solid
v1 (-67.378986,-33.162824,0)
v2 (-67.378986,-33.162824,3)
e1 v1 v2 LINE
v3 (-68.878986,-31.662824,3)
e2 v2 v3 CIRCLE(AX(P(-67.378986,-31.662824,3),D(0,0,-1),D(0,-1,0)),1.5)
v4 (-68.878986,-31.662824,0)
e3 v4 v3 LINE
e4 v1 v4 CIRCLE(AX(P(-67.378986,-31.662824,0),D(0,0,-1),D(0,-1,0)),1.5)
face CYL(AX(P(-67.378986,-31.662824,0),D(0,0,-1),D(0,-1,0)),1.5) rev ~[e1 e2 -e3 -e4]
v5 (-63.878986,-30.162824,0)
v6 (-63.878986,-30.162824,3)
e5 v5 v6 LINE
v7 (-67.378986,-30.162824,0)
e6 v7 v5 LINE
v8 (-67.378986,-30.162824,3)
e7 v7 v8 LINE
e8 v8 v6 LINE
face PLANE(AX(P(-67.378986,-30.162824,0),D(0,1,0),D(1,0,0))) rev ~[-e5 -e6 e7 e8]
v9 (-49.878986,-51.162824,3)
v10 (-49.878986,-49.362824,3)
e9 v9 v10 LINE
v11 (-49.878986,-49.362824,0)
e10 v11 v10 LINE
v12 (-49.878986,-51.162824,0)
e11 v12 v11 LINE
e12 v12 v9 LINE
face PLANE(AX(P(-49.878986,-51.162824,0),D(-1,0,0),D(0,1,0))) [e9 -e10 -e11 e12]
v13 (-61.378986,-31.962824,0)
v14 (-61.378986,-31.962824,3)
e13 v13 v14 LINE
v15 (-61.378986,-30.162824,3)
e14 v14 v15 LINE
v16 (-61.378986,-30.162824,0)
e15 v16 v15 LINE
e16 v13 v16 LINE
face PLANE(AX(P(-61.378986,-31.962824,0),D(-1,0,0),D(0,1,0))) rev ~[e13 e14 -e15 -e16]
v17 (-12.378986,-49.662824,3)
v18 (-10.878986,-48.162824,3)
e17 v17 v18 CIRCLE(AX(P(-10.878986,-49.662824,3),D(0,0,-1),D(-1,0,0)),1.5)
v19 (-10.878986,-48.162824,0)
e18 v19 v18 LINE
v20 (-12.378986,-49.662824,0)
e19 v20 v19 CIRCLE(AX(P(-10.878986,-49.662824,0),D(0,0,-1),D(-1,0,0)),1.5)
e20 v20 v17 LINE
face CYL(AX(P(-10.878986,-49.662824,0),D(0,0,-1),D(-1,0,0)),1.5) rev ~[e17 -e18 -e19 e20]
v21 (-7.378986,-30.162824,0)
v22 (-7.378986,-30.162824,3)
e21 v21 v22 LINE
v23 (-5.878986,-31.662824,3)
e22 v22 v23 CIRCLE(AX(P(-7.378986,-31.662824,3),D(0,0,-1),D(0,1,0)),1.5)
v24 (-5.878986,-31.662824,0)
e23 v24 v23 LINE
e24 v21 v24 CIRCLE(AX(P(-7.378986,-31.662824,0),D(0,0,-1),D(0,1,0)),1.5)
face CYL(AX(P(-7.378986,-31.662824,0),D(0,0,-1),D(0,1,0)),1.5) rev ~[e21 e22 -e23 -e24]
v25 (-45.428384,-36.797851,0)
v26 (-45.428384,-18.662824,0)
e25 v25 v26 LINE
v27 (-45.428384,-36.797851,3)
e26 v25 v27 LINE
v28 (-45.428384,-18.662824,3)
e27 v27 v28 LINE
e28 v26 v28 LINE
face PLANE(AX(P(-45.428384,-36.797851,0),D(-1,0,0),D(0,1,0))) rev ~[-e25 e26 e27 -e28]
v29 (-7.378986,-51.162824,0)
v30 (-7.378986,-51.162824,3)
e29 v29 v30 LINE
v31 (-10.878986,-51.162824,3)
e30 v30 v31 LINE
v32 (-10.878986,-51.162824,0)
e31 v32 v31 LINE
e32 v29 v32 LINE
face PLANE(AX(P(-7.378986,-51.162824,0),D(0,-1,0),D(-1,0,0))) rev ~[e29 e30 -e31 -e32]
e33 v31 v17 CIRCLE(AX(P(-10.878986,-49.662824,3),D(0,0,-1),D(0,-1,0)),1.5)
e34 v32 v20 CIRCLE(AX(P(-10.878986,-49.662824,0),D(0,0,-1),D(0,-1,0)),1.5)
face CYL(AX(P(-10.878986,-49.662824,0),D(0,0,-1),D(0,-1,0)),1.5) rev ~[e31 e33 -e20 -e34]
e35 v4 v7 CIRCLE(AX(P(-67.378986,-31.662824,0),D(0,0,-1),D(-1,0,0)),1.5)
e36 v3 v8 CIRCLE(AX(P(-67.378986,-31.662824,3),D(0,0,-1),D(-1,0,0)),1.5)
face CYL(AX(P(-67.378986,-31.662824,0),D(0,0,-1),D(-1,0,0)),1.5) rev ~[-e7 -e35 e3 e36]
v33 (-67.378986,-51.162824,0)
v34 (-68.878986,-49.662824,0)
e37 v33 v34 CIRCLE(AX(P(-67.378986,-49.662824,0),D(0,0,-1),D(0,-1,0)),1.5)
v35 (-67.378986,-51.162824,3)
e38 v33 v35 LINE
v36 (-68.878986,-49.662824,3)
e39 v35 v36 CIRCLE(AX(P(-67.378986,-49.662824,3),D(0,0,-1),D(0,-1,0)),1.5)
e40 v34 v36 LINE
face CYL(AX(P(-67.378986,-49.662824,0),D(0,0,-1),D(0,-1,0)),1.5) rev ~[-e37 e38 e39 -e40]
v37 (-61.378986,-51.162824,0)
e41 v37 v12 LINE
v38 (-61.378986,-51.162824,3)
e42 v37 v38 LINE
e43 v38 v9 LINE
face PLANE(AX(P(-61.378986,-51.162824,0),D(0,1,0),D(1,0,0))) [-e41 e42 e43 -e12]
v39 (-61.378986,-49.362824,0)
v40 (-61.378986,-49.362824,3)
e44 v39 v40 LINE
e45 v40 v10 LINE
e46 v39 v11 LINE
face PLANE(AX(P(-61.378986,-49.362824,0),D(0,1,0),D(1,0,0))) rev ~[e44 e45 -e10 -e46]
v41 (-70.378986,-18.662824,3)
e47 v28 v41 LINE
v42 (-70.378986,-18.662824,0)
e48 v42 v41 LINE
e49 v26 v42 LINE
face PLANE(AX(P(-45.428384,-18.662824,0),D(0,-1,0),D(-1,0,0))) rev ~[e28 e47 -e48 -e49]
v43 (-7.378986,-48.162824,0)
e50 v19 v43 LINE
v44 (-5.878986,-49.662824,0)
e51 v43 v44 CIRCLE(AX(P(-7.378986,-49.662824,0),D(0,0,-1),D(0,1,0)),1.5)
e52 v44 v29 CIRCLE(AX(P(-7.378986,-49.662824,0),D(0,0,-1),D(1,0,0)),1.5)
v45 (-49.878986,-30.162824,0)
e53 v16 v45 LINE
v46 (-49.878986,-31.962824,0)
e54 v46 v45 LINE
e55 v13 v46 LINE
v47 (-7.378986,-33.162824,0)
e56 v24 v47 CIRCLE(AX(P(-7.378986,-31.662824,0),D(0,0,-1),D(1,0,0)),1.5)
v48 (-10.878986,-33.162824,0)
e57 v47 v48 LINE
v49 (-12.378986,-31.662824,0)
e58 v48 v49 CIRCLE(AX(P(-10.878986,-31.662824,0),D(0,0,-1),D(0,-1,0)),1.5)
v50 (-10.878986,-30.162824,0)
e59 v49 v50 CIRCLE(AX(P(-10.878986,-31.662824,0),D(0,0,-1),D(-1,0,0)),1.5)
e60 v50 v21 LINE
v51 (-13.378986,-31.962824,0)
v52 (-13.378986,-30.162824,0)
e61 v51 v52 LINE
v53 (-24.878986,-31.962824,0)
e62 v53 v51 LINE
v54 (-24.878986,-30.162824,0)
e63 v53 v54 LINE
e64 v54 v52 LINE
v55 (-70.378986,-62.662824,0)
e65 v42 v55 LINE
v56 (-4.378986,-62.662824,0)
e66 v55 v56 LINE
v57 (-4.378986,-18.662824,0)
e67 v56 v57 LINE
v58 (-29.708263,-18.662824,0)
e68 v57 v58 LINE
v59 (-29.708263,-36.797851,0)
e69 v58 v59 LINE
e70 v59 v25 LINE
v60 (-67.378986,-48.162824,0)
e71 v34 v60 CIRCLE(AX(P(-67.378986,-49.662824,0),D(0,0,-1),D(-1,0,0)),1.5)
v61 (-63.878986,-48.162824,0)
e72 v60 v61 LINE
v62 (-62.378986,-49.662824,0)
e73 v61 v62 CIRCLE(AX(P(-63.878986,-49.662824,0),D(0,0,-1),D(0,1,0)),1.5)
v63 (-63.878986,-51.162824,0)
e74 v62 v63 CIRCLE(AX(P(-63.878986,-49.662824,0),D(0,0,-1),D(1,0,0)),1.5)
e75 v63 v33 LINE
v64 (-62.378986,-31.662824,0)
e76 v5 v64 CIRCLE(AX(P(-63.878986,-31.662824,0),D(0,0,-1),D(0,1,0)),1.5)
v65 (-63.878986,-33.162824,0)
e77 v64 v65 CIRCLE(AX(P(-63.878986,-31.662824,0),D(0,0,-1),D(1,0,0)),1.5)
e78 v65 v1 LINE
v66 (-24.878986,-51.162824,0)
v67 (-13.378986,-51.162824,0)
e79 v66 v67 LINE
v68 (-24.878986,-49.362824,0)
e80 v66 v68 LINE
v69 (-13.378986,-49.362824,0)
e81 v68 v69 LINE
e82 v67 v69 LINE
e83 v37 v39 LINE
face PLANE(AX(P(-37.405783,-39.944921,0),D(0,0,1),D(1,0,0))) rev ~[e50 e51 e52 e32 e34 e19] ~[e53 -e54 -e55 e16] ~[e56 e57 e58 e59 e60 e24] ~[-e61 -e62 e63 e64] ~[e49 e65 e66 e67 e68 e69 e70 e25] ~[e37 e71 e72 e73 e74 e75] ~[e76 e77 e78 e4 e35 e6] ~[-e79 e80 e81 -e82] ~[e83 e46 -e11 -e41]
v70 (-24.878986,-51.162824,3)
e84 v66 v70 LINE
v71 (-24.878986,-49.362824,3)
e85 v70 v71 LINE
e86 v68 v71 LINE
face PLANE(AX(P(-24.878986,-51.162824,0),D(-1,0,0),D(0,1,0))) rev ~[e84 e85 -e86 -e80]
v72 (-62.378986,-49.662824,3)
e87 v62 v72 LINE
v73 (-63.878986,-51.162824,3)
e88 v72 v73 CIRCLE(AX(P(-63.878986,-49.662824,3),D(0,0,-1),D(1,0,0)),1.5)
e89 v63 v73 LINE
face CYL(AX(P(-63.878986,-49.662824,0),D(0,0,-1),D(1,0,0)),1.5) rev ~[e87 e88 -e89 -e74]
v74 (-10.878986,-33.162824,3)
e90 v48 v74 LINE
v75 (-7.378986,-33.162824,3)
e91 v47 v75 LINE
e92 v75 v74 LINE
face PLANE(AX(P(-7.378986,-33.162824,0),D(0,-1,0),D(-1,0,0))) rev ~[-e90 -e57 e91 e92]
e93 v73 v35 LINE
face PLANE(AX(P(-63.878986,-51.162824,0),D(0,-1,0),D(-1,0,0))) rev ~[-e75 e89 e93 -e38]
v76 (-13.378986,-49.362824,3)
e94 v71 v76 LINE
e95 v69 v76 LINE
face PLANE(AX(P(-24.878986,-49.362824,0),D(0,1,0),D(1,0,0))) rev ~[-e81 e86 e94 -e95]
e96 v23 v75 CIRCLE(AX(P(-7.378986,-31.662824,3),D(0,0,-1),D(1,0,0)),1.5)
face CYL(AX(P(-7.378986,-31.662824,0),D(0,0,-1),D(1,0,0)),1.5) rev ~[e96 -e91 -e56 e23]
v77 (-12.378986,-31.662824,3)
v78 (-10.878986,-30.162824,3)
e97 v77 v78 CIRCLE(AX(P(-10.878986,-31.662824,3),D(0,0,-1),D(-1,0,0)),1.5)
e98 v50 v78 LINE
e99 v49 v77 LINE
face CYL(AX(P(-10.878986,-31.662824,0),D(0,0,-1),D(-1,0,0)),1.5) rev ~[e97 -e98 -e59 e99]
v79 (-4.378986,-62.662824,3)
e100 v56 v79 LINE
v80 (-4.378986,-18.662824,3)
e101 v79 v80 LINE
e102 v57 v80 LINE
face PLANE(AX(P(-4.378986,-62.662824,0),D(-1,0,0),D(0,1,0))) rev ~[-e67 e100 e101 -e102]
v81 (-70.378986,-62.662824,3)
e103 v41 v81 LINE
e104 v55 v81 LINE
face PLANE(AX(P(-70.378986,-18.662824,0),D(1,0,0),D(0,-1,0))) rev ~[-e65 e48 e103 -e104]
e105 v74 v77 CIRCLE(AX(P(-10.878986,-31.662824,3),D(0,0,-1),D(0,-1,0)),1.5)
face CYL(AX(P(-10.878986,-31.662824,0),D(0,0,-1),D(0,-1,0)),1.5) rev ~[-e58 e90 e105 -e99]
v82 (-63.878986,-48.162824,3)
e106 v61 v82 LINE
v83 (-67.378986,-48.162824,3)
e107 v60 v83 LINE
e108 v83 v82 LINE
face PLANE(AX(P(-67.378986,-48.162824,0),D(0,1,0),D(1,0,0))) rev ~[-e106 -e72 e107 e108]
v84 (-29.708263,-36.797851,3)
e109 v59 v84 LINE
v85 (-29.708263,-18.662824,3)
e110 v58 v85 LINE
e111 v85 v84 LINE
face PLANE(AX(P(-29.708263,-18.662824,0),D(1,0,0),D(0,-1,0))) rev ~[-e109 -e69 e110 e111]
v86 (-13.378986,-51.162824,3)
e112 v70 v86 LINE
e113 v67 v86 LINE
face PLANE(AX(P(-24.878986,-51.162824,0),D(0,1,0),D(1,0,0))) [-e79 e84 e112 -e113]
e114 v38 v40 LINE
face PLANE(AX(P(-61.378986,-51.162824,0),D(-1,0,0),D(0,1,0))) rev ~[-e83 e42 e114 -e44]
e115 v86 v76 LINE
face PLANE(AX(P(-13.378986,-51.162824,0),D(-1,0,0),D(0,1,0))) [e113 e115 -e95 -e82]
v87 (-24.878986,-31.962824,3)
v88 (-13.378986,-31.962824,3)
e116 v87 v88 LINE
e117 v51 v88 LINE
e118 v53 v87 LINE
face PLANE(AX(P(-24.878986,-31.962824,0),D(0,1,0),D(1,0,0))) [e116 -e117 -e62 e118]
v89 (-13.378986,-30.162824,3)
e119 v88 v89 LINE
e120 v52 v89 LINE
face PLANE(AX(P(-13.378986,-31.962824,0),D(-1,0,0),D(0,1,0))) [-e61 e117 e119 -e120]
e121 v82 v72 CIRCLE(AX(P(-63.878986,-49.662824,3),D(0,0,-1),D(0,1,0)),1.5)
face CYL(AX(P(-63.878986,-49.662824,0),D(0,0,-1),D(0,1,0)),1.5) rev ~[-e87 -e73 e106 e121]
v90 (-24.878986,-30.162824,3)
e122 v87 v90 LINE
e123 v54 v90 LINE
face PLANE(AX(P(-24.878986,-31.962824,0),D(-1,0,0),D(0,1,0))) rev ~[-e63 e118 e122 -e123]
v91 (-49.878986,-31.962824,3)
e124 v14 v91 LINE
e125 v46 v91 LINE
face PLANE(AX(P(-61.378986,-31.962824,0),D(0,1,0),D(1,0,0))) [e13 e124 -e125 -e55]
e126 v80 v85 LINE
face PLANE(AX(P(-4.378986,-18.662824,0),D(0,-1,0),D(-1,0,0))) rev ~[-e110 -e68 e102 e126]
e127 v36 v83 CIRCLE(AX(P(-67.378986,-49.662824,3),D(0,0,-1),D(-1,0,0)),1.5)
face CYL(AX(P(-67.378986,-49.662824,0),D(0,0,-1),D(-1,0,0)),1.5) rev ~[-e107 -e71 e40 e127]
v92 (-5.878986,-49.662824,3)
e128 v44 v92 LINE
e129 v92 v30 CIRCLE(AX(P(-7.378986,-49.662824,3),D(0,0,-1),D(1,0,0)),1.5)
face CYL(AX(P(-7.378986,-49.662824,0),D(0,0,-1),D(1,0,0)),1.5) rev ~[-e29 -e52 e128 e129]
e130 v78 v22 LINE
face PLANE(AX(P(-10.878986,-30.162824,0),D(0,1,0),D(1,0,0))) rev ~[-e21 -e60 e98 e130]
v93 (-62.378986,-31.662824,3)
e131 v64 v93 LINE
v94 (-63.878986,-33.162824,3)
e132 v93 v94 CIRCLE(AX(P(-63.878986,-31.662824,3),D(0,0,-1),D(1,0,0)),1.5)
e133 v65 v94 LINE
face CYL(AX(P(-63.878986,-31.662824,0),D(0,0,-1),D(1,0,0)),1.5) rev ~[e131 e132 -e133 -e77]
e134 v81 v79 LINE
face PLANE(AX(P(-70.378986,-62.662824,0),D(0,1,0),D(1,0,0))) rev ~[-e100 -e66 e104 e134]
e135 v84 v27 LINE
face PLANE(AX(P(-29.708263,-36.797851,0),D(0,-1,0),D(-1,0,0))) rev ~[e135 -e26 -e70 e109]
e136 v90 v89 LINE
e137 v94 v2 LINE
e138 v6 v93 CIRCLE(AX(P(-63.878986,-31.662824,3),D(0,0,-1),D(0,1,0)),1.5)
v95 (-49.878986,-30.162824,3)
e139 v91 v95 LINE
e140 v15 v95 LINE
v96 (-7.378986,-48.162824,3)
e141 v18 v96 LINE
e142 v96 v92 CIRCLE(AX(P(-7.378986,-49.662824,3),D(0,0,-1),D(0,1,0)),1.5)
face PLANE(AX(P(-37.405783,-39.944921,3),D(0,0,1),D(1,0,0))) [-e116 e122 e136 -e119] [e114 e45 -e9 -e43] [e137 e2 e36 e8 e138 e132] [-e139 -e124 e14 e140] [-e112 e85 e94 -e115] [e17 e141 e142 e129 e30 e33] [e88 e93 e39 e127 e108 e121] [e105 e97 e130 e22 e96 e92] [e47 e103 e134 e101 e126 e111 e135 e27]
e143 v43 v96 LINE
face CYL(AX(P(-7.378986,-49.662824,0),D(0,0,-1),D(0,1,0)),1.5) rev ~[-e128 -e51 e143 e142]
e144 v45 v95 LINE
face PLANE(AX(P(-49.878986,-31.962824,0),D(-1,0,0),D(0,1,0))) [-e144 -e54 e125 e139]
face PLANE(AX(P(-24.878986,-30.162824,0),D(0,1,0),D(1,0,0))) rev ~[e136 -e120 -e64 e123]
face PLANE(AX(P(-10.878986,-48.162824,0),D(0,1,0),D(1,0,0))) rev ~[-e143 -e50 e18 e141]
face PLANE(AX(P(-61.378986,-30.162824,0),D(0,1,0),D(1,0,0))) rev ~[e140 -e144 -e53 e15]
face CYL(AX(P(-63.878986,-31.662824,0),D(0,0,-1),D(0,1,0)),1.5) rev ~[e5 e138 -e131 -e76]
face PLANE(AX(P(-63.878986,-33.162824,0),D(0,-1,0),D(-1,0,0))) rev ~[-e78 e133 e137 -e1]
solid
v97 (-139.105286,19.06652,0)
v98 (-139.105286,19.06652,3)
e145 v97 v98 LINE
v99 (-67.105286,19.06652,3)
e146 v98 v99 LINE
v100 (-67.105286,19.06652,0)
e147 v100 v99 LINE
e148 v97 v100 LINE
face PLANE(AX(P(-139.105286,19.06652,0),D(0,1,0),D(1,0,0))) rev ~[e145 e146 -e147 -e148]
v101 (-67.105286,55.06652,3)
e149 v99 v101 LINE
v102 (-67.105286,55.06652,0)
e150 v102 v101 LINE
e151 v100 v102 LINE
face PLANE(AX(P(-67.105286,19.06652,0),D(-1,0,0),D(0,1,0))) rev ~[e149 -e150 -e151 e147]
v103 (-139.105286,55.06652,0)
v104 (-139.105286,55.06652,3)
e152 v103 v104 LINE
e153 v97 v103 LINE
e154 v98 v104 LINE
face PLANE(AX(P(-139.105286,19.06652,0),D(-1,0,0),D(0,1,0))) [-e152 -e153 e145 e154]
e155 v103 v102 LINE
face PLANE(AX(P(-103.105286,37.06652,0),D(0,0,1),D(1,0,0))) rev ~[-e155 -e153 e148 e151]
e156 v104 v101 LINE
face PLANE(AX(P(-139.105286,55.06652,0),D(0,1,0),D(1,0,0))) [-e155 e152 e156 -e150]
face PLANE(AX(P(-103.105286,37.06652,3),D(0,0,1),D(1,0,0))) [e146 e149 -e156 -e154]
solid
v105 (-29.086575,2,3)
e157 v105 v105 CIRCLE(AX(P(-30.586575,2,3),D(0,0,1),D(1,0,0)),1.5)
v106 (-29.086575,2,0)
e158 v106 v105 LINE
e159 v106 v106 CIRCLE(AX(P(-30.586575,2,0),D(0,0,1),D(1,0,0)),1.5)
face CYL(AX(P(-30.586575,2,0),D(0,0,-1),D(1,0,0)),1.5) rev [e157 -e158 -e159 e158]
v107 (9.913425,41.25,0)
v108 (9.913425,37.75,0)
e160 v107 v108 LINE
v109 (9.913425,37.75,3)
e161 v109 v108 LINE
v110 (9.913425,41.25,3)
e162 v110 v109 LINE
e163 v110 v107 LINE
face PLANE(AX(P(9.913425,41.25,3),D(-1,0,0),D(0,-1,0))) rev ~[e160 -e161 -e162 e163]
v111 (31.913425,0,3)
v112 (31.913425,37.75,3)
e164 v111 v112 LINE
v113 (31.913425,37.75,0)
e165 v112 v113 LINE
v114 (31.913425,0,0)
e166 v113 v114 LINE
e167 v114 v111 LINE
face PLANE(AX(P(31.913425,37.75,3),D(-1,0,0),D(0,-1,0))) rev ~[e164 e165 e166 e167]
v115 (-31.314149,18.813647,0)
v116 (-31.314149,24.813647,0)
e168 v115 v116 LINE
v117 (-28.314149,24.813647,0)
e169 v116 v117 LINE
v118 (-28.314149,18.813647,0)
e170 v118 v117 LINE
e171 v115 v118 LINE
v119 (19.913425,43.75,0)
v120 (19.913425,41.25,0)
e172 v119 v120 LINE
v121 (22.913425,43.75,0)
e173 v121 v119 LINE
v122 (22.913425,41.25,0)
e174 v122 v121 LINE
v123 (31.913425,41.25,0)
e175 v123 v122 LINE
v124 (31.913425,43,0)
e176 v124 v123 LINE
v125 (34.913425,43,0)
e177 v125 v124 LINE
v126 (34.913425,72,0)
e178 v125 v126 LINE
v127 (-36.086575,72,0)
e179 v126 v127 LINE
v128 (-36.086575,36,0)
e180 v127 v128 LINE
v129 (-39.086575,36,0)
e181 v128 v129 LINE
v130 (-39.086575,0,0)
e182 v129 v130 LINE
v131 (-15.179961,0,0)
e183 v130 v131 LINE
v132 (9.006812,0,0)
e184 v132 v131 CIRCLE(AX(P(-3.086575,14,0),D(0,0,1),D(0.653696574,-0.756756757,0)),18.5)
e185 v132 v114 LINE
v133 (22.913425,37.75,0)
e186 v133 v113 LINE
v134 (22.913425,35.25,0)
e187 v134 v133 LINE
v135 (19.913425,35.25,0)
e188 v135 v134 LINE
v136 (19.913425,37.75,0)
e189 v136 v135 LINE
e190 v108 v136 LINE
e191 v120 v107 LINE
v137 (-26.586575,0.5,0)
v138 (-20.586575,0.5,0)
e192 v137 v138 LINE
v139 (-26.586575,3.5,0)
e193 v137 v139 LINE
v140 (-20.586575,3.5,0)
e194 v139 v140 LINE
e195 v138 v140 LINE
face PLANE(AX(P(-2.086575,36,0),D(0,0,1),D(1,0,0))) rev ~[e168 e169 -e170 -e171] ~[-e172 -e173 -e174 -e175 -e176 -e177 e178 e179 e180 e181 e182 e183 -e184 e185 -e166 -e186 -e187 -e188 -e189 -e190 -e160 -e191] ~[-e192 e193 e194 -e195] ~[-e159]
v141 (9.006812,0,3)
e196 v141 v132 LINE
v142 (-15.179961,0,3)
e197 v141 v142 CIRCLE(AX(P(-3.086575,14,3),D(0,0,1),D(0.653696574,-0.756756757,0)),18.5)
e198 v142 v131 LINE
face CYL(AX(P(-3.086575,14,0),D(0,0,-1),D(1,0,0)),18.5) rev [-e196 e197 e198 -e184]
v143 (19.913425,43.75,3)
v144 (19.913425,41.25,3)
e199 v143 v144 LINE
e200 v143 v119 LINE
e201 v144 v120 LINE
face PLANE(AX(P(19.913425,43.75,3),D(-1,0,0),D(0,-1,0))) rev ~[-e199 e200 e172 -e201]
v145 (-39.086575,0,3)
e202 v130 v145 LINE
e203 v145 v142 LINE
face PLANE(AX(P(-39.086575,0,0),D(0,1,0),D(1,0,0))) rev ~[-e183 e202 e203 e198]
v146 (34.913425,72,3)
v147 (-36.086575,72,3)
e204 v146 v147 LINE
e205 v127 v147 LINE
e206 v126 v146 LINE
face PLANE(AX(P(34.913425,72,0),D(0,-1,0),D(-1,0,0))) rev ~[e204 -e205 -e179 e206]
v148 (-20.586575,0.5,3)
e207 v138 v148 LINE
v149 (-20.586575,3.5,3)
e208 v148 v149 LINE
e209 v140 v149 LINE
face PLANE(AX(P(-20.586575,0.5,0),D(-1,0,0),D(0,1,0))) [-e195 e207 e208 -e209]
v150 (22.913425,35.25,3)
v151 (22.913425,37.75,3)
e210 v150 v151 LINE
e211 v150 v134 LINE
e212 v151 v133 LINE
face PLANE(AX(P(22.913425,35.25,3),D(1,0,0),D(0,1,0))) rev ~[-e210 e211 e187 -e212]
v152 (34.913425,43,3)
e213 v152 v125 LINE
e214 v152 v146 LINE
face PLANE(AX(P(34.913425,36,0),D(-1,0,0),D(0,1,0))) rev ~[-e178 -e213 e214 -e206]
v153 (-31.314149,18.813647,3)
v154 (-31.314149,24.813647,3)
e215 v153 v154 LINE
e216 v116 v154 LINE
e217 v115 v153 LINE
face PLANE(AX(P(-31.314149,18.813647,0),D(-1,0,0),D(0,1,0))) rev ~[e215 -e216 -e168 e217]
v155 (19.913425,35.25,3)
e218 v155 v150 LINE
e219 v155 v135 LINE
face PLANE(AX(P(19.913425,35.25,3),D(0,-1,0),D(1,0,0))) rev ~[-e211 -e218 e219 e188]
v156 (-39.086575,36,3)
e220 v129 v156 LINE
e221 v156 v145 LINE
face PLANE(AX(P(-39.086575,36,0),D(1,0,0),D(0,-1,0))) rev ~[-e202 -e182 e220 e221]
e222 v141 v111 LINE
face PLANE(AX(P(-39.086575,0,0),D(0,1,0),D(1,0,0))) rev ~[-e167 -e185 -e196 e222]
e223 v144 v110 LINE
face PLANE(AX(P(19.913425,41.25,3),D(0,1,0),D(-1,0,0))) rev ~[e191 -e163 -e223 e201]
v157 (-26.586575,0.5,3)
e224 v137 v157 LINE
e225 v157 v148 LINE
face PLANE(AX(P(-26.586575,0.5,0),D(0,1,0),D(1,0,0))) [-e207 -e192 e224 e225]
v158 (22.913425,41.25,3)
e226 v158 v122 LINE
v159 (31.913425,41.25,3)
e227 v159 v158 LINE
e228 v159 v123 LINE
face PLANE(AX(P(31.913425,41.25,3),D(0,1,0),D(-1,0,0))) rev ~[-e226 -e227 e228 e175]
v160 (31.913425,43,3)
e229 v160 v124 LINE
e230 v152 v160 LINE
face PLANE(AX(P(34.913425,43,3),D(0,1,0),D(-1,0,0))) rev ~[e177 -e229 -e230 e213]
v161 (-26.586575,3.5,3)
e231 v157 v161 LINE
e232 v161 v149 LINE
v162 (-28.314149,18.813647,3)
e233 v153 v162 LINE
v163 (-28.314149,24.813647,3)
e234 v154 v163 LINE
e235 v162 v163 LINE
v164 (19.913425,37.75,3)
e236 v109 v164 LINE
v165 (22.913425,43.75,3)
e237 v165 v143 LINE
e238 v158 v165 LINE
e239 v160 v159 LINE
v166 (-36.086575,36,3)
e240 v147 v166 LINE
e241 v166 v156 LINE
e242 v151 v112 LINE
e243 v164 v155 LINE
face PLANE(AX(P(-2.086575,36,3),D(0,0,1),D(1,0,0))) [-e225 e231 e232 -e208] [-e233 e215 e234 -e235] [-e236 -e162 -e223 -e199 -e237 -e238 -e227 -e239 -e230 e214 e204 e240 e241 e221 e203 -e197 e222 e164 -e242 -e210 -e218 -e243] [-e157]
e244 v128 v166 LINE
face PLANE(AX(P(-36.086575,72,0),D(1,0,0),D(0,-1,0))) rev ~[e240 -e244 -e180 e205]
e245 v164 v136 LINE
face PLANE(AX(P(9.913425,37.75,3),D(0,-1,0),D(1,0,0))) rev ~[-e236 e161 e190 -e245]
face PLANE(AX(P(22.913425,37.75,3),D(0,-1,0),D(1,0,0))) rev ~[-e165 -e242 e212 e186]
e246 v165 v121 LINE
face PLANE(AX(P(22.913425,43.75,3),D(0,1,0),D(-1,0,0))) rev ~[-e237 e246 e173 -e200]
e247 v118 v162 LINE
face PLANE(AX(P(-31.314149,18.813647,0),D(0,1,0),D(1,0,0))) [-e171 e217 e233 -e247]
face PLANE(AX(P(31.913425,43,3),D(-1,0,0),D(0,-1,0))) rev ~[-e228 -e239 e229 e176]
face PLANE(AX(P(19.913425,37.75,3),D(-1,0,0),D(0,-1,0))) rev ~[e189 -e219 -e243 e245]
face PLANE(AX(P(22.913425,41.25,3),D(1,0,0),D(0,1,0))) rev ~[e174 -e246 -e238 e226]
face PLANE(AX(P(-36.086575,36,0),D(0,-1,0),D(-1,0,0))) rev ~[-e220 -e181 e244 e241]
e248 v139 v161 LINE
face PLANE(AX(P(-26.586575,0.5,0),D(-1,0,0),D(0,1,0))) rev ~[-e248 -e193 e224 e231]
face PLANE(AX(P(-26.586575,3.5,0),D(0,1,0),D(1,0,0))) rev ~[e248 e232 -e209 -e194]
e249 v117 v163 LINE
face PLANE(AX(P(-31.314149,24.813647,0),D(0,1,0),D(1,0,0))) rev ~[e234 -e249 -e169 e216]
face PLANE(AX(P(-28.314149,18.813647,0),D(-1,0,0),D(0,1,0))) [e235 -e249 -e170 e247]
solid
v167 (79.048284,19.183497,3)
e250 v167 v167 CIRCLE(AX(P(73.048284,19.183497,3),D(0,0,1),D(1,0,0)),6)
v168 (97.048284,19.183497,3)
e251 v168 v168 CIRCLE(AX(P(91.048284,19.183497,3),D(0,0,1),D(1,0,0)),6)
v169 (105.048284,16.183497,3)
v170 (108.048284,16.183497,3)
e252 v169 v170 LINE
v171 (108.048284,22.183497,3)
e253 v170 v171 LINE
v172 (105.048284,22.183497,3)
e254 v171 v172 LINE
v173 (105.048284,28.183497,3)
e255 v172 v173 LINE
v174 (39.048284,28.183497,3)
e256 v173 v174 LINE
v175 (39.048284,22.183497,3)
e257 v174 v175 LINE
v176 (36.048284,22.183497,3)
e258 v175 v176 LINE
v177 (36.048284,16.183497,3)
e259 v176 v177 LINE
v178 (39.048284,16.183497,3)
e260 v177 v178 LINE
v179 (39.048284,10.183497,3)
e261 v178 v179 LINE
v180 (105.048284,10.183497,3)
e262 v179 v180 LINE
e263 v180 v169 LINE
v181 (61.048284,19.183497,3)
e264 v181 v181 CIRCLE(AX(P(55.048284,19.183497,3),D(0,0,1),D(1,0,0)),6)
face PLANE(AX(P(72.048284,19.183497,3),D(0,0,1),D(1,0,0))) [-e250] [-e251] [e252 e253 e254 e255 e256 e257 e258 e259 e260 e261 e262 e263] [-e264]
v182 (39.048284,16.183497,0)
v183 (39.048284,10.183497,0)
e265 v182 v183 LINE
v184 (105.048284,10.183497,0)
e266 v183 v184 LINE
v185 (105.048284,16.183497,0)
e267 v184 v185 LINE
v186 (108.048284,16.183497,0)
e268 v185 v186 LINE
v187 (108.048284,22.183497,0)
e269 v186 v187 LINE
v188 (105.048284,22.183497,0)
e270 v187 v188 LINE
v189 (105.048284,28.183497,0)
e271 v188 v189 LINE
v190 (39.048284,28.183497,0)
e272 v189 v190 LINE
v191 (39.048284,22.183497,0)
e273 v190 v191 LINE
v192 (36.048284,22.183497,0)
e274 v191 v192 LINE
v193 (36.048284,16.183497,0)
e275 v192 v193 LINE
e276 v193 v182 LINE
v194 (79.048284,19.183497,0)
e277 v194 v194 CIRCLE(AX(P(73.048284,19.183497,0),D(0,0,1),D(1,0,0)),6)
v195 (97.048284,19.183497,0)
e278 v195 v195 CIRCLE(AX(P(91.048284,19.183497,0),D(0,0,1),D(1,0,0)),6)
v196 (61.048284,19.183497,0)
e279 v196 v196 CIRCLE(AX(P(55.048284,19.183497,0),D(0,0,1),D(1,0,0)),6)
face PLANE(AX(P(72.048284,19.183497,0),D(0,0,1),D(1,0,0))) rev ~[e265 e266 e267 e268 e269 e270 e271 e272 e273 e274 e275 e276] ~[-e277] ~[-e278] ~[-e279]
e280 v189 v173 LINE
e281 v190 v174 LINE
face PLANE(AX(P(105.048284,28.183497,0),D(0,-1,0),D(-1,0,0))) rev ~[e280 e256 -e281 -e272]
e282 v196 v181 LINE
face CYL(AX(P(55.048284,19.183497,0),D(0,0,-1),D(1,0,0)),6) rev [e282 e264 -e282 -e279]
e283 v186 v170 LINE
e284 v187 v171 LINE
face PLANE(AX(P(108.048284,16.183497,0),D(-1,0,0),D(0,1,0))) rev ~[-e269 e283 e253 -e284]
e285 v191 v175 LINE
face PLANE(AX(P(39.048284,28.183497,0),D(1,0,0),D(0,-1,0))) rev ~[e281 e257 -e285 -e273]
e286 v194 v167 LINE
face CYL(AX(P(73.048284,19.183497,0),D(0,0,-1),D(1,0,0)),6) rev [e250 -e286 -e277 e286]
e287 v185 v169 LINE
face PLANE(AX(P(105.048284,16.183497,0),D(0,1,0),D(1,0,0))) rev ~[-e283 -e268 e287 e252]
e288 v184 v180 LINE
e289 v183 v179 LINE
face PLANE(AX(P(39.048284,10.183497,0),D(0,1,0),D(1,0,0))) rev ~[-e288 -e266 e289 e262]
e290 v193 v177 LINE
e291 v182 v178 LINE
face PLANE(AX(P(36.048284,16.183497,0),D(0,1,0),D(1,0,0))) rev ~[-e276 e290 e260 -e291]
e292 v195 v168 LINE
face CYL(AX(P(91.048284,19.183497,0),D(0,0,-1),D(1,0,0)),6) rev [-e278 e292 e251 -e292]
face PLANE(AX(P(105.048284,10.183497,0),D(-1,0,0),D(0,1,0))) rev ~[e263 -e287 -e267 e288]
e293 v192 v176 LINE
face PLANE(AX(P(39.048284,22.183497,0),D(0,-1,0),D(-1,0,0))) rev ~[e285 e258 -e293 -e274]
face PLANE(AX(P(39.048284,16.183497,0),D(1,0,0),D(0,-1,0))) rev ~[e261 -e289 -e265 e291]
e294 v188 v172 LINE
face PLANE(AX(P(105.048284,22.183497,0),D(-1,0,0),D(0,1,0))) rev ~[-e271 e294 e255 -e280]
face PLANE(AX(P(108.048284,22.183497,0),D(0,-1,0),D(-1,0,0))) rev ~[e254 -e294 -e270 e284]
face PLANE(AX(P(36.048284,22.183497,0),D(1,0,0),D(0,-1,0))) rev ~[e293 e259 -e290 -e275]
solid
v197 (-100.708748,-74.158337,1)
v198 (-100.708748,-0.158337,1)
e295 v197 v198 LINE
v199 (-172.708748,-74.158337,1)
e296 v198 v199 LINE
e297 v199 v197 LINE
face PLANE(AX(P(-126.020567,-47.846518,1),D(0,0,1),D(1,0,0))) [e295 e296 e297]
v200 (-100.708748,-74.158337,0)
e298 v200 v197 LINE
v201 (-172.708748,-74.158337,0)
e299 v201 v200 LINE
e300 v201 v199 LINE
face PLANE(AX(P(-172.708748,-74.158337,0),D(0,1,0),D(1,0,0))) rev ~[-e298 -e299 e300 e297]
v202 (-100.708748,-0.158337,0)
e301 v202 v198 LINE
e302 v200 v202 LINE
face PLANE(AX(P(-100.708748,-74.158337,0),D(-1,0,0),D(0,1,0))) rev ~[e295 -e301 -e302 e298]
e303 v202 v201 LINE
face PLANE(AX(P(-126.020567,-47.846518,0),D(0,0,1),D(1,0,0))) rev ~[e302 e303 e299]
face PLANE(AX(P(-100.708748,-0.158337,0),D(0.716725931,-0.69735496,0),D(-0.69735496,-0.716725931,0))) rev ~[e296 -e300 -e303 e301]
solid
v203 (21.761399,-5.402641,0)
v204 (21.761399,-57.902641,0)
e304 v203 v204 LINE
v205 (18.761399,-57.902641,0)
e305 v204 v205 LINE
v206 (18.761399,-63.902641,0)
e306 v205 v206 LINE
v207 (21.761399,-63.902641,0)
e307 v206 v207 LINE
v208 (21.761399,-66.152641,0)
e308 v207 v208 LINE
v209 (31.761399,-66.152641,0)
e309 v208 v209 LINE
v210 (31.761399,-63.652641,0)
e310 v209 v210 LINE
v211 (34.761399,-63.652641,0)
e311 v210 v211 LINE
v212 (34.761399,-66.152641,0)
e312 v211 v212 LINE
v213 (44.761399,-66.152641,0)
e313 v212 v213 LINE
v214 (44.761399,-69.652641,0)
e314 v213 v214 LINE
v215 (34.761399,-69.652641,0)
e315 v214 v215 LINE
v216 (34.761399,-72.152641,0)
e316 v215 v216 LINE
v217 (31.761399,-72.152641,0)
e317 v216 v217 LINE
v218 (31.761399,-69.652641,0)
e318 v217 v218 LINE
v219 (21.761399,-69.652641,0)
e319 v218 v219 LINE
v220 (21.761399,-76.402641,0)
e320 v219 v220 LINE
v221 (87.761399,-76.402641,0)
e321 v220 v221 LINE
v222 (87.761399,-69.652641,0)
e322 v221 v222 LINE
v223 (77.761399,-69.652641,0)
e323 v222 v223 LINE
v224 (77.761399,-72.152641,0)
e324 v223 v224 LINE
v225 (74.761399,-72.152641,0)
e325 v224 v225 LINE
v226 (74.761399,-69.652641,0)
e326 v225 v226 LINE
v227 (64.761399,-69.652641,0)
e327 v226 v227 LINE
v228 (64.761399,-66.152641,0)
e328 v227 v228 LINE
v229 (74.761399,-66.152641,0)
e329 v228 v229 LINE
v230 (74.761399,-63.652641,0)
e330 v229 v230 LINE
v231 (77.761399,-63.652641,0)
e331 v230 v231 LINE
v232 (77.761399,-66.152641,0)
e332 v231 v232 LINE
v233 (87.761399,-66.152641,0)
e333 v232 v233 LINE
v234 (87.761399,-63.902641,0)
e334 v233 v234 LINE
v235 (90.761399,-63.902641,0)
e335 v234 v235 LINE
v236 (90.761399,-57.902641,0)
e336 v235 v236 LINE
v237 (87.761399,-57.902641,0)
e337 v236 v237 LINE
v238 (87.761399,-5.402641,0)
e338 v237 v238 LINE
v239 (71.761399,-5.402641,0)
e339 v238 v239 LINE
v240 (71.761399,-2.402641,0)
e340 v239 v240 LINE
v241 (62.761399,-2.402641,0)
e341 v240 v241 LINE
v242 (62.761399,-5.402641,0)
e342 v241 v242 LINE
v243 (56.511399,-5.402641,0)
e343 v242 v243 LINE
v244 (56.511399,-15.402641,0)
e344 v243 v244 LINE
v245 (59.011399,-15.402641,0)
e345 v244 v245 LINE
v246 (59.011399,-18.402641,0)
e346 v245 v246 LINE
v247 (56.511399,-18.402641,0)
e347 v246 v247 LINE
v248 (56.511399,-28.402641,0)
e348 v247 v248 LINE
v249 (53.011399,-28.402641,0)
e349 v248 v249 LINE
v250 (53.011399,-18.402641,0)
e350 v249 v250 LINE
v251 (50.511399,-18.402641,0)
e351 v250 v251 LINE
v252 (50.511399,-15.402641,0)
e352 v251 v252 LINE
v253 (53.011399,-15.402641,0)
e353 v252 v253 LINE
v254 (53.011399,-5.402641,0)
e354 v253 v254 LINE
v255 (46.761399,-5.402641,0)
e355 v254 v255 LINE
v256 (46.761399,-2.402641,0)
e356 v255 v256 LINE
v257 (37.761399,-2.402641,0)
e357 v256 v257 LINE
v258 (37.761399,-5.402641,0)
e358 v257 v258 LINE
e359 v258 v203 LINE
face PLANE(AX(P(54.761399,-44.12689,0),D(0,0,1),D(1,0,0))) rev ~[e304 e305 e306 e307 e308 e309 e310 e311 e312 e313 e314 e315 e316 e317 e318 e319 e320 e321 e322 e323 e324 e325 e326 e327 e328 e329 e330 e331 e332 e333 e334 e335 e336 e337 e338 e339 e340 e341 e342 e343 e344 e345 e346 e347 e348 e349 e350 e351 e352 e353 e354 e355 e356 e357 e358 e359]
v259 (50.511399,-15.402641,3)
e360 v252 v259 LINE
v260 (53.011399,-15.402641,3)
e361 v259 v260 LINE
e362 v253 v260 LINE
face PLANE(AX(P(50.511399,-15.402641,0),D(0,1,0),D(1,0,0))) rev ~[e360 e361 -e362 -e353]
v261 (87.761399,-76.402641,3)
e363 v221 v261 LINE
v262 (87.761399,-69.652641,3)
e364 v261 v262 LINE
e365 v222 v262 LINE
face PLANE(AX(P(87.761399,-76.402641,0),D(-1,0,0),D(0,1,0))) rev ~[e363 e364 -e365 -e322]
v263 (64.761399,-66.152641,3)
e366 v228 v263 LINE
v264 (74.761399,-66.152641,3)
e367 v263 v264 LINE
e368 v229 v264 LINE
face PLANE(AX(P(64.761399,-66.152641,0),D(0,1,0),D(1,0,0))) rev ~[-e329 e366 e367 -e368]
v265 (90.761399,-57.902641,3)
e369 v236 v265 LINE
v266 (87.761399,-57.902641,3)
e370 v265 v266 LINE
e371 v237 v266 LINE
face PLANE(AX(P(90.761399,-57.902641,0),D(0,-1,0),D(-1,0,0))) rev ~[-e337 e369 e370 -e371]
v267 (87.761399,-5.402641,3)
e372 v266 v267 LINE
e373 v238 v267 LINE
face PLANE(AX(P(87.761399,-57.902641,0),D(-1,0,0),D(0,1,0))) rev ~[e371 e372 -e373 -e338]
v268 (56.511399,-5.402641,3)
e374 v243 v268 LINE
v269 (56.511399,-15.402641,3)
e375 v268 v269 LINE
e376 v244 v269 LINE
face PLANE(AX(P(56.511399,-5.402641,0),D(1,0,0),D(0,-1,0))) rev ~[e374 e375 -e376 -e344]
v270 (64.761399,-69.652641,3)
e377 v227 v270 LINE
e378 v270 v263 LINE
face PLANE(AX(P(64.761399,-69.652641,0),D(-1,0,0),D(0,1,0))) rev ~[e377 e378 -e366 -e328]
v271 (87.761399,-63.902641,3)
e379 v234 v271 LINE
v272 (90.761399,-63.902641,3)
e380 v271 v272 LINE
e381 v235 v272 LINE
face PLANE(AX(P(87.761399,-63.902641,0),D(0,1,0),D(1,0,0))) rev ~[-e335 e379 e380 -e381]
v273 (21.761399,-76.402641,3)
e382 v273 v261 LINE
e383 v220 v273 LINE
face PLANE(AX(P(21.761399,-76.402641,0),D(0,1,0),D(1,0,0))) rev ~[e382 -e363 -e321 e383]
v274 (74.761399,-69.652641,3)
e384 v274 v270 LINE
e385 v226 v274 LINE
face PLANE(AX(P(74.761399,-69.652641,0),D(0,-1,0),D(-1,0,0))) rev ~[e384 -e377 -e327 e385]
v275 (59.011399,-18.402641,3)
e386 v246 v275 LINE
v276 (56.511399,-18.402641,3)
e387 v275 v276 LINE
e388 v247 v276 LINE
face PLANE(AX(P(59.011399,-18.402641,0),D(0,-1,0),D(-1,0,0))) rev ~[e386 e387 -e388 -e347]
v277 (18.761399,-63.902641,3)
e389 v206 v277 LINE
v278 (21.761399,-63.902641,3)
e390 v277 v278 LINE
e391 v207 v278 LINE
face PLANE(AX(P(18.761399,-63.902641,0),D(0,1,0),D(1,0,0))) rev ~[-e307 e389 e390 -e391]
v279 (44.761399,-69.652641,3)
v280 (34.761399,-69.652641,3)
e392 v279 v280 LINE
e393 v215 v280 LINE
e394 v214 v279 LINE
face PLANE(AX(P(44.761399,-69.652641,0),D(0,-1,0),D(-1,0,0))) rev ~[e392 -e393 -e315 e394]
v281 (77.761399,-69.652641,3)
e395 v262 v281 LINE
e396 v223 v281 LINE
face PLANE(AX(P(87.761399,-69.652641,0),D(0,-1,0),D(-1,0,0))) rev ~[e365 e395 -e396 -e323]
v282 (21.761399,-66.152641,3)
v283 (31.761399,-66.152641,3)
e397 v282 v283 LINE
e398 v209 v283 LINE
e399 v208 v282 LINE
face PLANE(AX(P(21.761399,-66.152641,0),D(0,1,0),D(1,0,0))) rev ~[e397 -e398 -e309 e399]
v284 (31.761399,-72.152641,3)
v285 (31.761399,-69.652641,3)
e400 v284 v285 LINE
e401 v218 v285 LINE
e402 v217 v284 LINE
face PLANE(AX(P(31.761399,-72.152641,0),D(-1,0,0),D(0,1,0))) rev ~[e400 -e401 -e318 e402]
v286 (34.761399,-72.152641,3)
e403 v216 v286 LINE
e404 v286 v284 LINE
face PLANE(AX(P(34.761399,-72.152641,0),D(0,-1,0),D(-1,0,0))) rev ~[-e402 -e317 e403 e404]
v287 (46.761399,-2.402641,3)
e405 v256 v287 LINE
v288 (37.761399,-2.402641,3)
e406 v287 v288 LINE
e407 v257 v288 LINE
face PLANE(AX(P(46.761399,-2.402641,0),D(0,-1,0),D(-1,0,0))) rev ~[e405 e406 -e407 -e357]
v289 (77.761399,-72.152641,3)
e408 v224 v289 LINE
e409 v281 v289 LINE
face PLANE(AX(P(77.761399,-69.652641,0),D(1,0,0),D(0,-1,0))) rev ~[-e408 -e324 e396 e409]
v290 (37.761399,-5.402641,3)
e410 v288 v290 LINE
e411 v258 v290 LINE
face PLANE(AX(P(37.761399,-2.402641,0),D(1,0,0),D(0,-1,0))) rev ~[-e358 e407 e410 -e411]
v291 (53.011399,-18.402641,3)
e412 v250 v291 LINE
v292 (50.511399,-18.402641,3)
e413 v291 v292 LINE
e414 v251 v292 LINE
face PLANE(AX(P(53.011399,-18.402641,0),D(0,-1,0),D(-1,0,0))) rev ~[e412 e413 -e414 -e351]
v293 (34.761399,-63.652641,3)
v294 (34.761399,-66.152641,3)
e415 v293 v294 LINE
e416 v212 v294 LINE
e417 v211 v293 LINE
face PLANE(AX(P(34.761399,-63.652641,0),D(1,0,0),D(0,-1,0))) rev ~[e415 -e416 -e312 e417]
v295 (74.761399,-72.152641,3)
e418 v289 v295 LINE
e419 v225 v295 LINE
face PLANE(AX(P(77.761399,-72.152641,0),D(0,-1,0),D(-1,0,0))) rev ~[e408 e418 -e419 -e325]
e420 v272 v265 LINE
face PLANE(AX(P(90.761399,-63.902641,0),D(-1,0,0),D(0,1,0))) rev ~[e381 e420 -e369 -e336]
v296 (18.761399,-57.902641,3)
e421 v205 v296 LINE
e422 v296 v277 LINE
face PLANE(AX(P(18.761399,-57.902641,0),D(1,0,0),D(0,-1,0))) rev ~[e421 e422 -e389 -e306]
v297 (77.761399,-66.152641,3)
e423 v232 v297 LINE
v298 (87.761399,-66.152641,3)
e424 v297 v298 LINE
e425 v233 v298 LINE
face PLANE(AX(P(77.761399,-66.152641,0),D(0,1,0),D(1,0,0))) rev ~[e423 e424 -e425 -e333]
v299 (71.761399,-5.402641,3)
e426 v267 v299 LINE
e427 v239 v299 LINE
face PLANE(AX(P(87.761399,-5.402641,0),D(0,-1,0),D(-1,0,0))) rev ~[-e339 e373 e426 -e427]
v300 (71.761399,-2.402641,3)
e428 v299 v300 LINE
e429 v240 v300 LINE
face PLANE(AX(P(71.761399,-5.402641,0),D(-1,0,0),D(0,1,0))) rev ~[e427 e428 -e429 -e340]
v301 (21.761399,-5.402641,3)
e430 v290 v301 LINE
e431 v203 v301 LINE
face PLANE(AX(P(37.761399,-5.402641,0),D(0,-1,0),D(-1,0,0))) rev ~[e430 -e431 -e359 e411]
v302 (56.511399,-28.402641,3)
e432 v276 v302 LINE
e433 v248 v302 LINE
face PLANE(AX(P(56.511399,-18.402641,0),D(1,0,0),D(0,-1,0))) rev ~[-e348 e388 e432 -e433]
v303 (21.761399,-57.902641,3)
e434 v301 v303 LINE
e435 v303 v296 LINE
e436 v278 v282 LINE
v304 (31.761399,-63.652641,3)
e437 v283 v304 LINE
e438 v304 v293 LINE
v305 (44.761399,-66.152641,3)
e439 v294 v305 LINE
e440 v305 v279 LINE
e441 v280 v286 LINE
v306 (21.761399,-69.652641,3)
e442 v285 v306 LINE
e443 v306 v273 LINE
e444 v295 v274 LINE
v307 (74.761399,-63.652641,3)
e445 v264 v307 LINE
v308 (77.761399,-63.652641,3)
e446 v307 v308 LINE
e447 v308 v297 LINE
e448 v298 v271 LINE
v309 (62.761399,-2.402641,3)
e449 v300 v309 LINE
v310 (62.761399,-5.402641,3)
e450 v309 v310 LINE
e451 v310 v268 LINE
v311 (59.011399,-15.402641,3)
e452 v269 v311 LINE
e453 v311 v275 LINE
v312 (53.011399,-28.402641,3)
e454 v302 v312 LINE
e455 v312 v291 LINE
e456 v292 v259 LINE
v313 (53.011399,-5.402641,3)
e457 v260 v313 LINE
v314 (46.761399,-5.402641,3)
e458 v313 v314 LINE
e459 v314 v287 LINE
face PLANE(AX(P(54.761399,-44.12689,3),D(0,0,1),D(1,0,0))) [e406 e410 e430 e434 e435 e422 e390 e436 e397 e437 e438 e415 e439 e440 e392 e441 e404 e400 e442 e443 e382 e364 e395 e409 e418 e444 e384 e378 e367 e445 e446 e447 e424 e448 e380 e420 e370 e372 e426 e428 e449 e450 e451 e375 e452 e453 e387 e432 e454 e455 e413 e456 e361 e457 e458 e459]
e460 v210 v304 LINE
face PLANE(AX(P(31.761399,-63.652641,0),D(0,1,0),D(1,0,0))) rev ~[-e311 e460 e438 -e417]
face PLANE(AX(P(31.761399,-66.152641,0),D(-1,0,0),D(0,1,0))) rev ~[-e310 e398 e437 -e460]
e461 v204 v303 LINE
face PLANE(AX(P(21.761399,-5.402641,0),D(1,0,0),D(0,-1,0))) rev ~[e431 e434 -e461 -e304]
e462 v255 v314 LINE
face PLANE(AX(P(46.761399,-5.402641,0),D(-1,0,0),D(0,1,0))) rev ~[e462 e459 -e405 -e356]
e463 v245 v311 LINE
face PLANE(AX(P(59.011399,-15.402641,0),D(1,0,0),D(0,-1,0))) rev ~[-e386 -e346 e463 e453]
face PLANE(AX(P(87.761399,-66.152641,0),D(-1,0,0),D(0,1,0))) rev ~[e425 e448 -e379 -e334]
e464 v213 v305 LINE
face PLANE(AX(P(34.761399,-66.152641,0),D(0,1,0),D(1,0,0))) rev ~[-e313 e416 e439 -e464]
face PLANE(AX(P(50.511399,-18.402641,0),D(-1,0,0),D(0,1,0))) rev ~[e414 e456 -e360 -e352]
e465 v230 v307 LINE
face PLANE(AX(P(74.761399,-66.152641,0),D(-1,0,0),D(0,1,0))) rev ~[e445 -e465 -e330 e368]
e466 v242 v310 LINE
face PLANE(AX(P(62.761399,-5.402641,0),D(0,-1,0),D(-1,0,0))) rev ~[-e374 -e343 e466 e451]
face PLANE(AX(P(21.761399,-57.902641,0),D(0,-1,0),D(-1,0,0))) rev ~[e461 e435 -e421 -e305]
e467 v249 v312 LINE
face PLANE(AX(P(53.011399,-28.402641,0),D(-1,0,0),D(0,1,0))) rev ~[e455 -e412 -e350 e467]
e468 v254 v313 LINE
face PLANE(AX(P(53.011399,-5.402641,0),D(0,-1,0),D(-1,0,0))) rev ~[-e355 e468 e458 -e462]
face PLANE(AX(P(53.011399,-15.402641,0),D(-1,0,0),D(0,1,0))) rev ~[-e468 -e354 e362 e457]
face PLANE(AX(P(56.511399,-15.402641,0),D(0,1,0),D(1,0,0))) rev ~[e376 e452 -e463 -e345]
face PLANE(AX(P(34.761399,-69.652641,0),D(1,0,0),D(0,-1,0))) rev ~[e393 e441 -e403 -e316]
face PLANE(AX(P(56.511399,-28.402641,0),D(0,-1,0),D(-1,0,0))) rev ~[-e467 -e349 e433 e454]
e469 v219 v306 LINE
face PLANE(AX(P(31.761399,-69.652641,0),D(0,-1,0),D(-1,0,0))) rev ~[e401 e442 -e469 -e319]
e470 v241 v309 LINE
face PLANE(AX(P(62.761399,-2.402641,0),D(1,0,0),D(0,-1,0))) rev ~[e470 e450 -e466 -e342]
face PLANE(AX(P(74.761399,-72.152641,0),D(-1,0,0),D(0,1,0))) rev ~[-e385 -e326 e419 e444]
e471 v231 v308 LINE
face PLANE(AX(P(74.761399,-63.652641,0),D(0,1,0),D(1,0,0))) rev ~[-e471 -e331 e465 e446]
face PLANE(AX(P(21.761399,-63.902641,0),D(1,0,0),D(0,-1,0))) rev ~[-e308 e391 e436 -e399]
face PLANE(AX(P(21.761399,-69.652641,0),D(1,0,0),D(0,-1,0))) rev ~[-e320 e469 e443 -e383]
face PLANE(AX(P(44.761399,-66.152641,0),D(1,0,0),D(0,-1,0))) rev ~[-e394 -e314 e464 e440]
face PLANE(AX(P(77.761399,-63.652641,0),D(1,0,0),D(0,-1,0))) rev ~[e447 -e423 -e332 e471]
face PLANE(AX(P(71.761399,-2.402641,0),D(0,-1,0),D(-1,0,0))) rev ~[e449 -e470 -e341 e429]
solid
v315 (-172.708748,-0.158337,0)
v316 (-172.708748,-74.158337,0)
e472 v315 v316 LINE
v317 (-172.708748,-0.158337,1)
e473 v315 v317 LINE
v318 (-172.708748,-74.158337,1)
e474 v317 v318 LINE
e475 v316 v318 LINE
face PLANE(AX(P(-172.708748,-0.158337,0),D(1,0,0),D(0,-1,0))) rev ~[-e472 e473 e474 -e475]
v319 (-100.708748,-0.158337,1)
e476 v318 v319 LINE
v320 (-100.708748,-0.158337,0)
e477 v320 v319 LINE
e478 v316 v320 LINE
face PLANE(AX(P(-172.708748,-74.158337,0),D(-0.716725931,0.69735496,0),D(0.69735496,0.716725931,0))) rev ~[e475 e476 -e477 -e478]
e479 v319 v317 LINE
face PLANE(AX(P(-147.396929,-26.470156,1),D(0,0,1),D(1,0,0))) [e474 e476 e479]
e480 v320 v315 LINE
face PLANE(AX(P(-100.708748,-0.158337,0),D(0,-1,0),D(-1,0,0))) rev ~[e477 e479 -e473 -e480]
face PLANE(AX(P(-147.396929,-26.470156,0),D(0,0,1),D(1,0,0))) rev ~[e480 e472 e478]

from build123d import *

# Parameters (mm, degrees)
F1_DEPTH  = 3
F2_R      = 18.5
F2_R_2    = 1.5
F2_W      = 6
F2_H      = 3
F2_W_2    = 3
F2_H_2    = 6
F3_DEPTH  = 3
F5_DEPTH  = 3
F6_W      = 11.5
F6_H      = 1.8
F7_DEPTH  = 3
F8_W      = 72
F8_H      = 36
F9_DEPTH  = 3
F11_DEPTH = 3
F13_DEPTH = 1
F14_DEPTH = 1
F15_R     = 6
F16_DEPTH = 3


# Not quite as in the source:
# - a feature names something its author has since deleted; it is built from what else it names


with BuildPart() as f1:
    # F0 (on Top) → F1 (new body)
    with BuildSketch(Plane.XY):
        Polygon((-39.0865747744, 0), (0, 0), (31.9134252256, 0), (31.9134252256, 36), (34.9134252256, 36), (34.9134252256, 72), (-36.0865747744, 72), (-36.0865747744, 36), (-39.0865747744, 36), align=None)
    extrude(amount=F1_DEPTH)

    # F2 (on face) → F3 (cut, through all)
    with BuildSketch(Plane.XY):
        with Locations((-3.0865747744, 14)):
            Circle(F2_R)
        with Locations((-30.5865747744, 2)):
            Circle(F2_R_2)
        with Locations((-23.5865747744, 2)):
            Rectangle(F2_W, F2_H)
        with Locations((-29.8141494989, 21.8136473298)):
            Rectangle(F2_W_2, F2_H_2)
    extrude(amount=F3_DEPTH, mode=Mode.SUBTRACT)

    # F4 (on face) → F5 (cut, through all)
    with BuildSketch(Plane.XY.offset(3)):
        Polygon((31.9134252256, 41.25), (22.9134252256, 41.25), (22.9134252256, 43.75), (19.9134252256, 43.75), (19.9134252256, 41.25), (9.9134252256, 41.25), (9.9134252256, 37.75), (19.9134252256, 37.75), (19.9134252256, 35.25), (22.9134252256, 35.25), (22.9134252256, 37.75), (31.9134252256, 37.75), (31.9134252256, 36), (34.9134252256, 36), (34.9134252256, 43), (31.9134252256, 43), align=None)
    extrude(amount=-F5_DEPTH, mode=Mode.SUBTRACT)


with BuildPart() as f7:
    # F6 (on Top) → F7 (new body)
    with BuildSketch(Plane.XY):
        Polygon((-45.4283840954, -18.6628243396), (-70.3789859414, -18.6628243396), (-70.3789859414, -62.6628243396), (-4.3789859414, -62.6628243396), (-4.3789859414, -18.6628243396), (-29.7082625329, -18.6628243396), (-29.7082625329, -36.7978513241), (-45.4283840954, -36.7978513241), align=None)
        with BuildLine():
            ThreePointArc((-63.8789859414, -48.1628243396), (-62.8183257696, -48.6021641678), (-62.3789859414, -49.6628243396))
            ThreePointArc((-62.3789859414, -49.6628243396), (-62.8183257696, -50.7234845114), (-63.8789859414, -51.1628243396))
            Line((-63.8789859414, -51.1628243396), (-67.3789859414, -51.1628243396))
            ThreePointArc((-67.3789859414, -51.1628243396), (-68.4396461132, -50.7234845114), (-68.8789859414, -49.6628243396))
            ThreePointArc((-68.8789859414, -49.6628243396), (-68.4396461132, -48.6021641678), (-67.3789859414, -48.1628243396))
            Line((-67.3789859414, -48.1628243396), (-63.8789859414, -48.1628243396))
        make_face(mode=Mode.SUBTRACT)
        with Locations((-55.6289859414, -50.2628243396)):
            Rectangle(F6_W, F6_H, mode=Mode.SUBTRACT)
        with Locations((-19.1289859414, -50.2628243396)):
            Rectangle(F6_W, F6_H, mode=Mode.SUBTRACT)
        with BuildLine():
            ThreePointArc((-5.8789859414, -49.6628243396), (-6.3183257696, -50.7234845114), (-7.3789859414, -51.1628243396))
            Line((-7.3789859414, -51.1628243396), (-10.8789859414, -51.1628243396))
            ThreePointArc((-10.8789859414, -51.1628243396), (-11.9396461132, -50.7234845114), (-12.3789859414, -49.6628243396))
            ThreePointArc((-12.3789859414, -49.6628243396), (-11.9396461132, -48.6021641678), (-10.8789859414, -48.1628243396))
            Line((-10.8789859414, -48.1628243396), (-7.3789859414, -48.1628243396))
            ThreePointArc((-7.3789859414, -48.1628243396), (-6.3183257696, -48.6021641678), (-5.8789859414, -49.6628243396))
        make_face(mode=Mode.SUBTRACT)
        with BuildLine():
            ThreePointArc((-68.8789859414, -31.6628243396), (-68.4396461132, -30.6021641678), (-67.3789859414, -30.1628243396))
            Line((-67.3789859414, -30.1628243396), (-63.8789859414, -30.1628243396))
            ThreePointArc((-63.8789859414, -30.1628243396), (-62.8183257696, -30.6021641678), (-62.3789859414, -31.6628243396))
            ThreePointArc((-62.3789859414, -31.6628243396), (-62.8183257696, -32.7234845114), (-63.8789859414, -33.1628243396))
            Line((-63.8789859414, -33.1628243396), (-67.3789859414, -33.1628243396))
            ThreePointArc((-67.3789859414, -33.1628243396), (-68.4396461132, -32.7234845114), (-68.8789859414, -31.6628243396))
        make_face(mode=Mode.SUBTRACT)
        with Locations((-55.6289859414, -31.0628243396)):
            Rectangle(F6_W, F6_H, mode=Mode.SUBTRACT)
        with Locations((-19.1289859414, -31.0628243396)):
            Rectangle(F6_W, F6_H, mode=Mode.SUBTRACT)
        with BuildLine():
            ThreePointArc((-10.8789859414, -33.1628243396), (-11.9396461132, -32.7234845114), (-12.3789859414, -31.6628243396))
            ThreePointArc((-12.3789859414, -31.6628243396), (-11.9396461132, -30.6021641678), (-10.8789859414, -30.1628243396))
            Line((-10.8789859414, -30.1628243396), (-7.3789859414, -30.1628243396))
            ThreePointArc((-7.3789859414, -30.1628243396), (-6.3183257696, -30.6021641678), (-5.8789859414, -31.6628243396))
            ThreePointArc((-5.8789859414, -31.6628243396), (-6.3183257696, -32.7234845114), (-7.3789859414, -33.1628243396))
            Line((-7.3789859414, -33.1628243396), (-10.8789859414, -33.1628243396))
        make_face(mode=Mode.SUBTRACT)
    extrude(amount=F7_DEPTH)


with BuildPart() as f9:
    # F8 (on Top) → F9 (new body)
    with BuildSketch(Plane.XY):
        with Locations((-103.1052859619, 37.0665201917)):
            Rectangle(F8_W, F8_H)
    extrude(amount=F9_DEPTH)


with BuildPart() as f11:
    # F10 (on Top) → F11 (new body)
    with BuildSketch(Plane.XY):
        Polygon((37.7613991201, -5.4026411064), (21.7613991201, -5.4026411064), (21.7613991201, -57.9026411064), (18.7613991201, -57.9026411064), (18.7613991201, -63.9026411064), (21.7613991201, -63.9026411064), (21.7613991201, -66.1526411064), (31.7613991201, -66.1526411064), (31.7613991201, -63.6526411064), (34.7613991201, -63.6526411064), (34.7613991201, -66.1526411064), (44.7613991201, -66.1526411064), (44.7613991201, -69.6526411064), (34.7613991201, -69.6526411064), (34.7613991201, -72.1526411064), (31.7613991201, -72.1526411064), (31.7613991201, -69.6526411064), (21.7613991201, -69.6526411064), (21.7613991201, -76.4026411064), (87.7613991201, -76.4026411064), (87.7613991201, -69.6526411064), (77.7613991201, -69.6526411064), (77.7613991201, -72.1526411064), (74.7613991201, -72.1526411064), (74.7613991201, -69.6526411064), (64.7613991201, -69.6526411064), (64.7613991201, -66.1526411064), (74.7613991201, -66.1526411064), (74.7613991201, -63.6526411064), (77.7613991201, -63.6526411064), (77.7613991201, -66.1526411064), (87.7613991201, -66.1526411064), (87.7613991201, -63.9026411064), (90.7613991201, -63.9026411064), (90.7613991201, -57.9026411064), (87.7613991201, -57.9026411064), (87.7613991201, -5.4026411064), (71.7613991201, -5.4026411064), (71.7613991201, -2.4026411064), (62.7613991201, -2.4026411064), (62.7613991201, -5.4026411064), (56.5113991201, -5.4026411064), (56.5113991201, -15.4026411064), (59.0113991201, -15.4026411064), (59.0113991201, -18.4026411064), (56.5113991201, -18.4026411064), (56.5113991201, -28.4026411064), (53.0113991201, -28.4026411064), (53.0113991201, -18.4026411064), (50.5113991201, -18.4026411064), (50.5113991201, -15.4026411064), (53.0113991201, -15.4026411064), (53.0113991201, -5.4026411064), (46.7613991201, -5.4026411064), (46.7613991201, -2.4026411064), (37.7613991201, -2.4026411064), align=None)
    extrude(amount=F11_DEPTH)


with BuildPart() as f13:
    # F12 (on Top) → F13 (new body)
    with BuildSketch(Plane.XY):
        Polygon((-100.7087475955, -0.1583366255), (-172.7087475955, -0.1583366255), (-172.7087475955, -74.1583366255), align=None)
    extrude(amount=F13_DEPTH)


with BuildPart() as f14:
    # F12 (on Top) → F14 (new body)
    with BuildSketch(Plane.XY):
        Polygon((-100.7087475955, -74.1583366255), (-100.7087475955, -0.1583366255), (-172.7087475955, -74.1583366255), align=None)
    extrude(amount=F14_DEPTH)


with BuildPart() as f16:
    # F15 (on Top) → F16 (new body)
    with BuildSketch(Plane.XY):
        Polygon((36.0482842449, 22.1834971545), (36.0482842449, 16.1834971545), (39.0482842449, 16.1834971545), (39.0482842449, 10.1834971545), (105.0482842449, 10.1834971545), (105.0482842449, 16.1834971545), (108.0482842449, 16.1834971545), (108.0482842449, 22.1834971545), (105.0482842449, 22.1834971545), (105.0482842449, 28.1834971545), (39.0482842449, 28.1834971545), (39.0482842449, 22.1834971545), align=None)
        with Locations((55.0482842449, 19.1834971545)):
            Circle(F15_R, mode=Mode.SUBTRACT)
        with Locations((73.0482842449, 19.1834971545)):
            Circle(F15_R, mode=Mode.SUBTRACT)
        with Locations((91.0482842449, 19.1834971545)):
            Circle(F15_R, mode=Mode.SUBTRACT)
    extrude(amount=F16_DEPTH)


solid = Compound([f1.part, f7.part, f9.part, f11.part, f13.part, f14.part, f16.part])
